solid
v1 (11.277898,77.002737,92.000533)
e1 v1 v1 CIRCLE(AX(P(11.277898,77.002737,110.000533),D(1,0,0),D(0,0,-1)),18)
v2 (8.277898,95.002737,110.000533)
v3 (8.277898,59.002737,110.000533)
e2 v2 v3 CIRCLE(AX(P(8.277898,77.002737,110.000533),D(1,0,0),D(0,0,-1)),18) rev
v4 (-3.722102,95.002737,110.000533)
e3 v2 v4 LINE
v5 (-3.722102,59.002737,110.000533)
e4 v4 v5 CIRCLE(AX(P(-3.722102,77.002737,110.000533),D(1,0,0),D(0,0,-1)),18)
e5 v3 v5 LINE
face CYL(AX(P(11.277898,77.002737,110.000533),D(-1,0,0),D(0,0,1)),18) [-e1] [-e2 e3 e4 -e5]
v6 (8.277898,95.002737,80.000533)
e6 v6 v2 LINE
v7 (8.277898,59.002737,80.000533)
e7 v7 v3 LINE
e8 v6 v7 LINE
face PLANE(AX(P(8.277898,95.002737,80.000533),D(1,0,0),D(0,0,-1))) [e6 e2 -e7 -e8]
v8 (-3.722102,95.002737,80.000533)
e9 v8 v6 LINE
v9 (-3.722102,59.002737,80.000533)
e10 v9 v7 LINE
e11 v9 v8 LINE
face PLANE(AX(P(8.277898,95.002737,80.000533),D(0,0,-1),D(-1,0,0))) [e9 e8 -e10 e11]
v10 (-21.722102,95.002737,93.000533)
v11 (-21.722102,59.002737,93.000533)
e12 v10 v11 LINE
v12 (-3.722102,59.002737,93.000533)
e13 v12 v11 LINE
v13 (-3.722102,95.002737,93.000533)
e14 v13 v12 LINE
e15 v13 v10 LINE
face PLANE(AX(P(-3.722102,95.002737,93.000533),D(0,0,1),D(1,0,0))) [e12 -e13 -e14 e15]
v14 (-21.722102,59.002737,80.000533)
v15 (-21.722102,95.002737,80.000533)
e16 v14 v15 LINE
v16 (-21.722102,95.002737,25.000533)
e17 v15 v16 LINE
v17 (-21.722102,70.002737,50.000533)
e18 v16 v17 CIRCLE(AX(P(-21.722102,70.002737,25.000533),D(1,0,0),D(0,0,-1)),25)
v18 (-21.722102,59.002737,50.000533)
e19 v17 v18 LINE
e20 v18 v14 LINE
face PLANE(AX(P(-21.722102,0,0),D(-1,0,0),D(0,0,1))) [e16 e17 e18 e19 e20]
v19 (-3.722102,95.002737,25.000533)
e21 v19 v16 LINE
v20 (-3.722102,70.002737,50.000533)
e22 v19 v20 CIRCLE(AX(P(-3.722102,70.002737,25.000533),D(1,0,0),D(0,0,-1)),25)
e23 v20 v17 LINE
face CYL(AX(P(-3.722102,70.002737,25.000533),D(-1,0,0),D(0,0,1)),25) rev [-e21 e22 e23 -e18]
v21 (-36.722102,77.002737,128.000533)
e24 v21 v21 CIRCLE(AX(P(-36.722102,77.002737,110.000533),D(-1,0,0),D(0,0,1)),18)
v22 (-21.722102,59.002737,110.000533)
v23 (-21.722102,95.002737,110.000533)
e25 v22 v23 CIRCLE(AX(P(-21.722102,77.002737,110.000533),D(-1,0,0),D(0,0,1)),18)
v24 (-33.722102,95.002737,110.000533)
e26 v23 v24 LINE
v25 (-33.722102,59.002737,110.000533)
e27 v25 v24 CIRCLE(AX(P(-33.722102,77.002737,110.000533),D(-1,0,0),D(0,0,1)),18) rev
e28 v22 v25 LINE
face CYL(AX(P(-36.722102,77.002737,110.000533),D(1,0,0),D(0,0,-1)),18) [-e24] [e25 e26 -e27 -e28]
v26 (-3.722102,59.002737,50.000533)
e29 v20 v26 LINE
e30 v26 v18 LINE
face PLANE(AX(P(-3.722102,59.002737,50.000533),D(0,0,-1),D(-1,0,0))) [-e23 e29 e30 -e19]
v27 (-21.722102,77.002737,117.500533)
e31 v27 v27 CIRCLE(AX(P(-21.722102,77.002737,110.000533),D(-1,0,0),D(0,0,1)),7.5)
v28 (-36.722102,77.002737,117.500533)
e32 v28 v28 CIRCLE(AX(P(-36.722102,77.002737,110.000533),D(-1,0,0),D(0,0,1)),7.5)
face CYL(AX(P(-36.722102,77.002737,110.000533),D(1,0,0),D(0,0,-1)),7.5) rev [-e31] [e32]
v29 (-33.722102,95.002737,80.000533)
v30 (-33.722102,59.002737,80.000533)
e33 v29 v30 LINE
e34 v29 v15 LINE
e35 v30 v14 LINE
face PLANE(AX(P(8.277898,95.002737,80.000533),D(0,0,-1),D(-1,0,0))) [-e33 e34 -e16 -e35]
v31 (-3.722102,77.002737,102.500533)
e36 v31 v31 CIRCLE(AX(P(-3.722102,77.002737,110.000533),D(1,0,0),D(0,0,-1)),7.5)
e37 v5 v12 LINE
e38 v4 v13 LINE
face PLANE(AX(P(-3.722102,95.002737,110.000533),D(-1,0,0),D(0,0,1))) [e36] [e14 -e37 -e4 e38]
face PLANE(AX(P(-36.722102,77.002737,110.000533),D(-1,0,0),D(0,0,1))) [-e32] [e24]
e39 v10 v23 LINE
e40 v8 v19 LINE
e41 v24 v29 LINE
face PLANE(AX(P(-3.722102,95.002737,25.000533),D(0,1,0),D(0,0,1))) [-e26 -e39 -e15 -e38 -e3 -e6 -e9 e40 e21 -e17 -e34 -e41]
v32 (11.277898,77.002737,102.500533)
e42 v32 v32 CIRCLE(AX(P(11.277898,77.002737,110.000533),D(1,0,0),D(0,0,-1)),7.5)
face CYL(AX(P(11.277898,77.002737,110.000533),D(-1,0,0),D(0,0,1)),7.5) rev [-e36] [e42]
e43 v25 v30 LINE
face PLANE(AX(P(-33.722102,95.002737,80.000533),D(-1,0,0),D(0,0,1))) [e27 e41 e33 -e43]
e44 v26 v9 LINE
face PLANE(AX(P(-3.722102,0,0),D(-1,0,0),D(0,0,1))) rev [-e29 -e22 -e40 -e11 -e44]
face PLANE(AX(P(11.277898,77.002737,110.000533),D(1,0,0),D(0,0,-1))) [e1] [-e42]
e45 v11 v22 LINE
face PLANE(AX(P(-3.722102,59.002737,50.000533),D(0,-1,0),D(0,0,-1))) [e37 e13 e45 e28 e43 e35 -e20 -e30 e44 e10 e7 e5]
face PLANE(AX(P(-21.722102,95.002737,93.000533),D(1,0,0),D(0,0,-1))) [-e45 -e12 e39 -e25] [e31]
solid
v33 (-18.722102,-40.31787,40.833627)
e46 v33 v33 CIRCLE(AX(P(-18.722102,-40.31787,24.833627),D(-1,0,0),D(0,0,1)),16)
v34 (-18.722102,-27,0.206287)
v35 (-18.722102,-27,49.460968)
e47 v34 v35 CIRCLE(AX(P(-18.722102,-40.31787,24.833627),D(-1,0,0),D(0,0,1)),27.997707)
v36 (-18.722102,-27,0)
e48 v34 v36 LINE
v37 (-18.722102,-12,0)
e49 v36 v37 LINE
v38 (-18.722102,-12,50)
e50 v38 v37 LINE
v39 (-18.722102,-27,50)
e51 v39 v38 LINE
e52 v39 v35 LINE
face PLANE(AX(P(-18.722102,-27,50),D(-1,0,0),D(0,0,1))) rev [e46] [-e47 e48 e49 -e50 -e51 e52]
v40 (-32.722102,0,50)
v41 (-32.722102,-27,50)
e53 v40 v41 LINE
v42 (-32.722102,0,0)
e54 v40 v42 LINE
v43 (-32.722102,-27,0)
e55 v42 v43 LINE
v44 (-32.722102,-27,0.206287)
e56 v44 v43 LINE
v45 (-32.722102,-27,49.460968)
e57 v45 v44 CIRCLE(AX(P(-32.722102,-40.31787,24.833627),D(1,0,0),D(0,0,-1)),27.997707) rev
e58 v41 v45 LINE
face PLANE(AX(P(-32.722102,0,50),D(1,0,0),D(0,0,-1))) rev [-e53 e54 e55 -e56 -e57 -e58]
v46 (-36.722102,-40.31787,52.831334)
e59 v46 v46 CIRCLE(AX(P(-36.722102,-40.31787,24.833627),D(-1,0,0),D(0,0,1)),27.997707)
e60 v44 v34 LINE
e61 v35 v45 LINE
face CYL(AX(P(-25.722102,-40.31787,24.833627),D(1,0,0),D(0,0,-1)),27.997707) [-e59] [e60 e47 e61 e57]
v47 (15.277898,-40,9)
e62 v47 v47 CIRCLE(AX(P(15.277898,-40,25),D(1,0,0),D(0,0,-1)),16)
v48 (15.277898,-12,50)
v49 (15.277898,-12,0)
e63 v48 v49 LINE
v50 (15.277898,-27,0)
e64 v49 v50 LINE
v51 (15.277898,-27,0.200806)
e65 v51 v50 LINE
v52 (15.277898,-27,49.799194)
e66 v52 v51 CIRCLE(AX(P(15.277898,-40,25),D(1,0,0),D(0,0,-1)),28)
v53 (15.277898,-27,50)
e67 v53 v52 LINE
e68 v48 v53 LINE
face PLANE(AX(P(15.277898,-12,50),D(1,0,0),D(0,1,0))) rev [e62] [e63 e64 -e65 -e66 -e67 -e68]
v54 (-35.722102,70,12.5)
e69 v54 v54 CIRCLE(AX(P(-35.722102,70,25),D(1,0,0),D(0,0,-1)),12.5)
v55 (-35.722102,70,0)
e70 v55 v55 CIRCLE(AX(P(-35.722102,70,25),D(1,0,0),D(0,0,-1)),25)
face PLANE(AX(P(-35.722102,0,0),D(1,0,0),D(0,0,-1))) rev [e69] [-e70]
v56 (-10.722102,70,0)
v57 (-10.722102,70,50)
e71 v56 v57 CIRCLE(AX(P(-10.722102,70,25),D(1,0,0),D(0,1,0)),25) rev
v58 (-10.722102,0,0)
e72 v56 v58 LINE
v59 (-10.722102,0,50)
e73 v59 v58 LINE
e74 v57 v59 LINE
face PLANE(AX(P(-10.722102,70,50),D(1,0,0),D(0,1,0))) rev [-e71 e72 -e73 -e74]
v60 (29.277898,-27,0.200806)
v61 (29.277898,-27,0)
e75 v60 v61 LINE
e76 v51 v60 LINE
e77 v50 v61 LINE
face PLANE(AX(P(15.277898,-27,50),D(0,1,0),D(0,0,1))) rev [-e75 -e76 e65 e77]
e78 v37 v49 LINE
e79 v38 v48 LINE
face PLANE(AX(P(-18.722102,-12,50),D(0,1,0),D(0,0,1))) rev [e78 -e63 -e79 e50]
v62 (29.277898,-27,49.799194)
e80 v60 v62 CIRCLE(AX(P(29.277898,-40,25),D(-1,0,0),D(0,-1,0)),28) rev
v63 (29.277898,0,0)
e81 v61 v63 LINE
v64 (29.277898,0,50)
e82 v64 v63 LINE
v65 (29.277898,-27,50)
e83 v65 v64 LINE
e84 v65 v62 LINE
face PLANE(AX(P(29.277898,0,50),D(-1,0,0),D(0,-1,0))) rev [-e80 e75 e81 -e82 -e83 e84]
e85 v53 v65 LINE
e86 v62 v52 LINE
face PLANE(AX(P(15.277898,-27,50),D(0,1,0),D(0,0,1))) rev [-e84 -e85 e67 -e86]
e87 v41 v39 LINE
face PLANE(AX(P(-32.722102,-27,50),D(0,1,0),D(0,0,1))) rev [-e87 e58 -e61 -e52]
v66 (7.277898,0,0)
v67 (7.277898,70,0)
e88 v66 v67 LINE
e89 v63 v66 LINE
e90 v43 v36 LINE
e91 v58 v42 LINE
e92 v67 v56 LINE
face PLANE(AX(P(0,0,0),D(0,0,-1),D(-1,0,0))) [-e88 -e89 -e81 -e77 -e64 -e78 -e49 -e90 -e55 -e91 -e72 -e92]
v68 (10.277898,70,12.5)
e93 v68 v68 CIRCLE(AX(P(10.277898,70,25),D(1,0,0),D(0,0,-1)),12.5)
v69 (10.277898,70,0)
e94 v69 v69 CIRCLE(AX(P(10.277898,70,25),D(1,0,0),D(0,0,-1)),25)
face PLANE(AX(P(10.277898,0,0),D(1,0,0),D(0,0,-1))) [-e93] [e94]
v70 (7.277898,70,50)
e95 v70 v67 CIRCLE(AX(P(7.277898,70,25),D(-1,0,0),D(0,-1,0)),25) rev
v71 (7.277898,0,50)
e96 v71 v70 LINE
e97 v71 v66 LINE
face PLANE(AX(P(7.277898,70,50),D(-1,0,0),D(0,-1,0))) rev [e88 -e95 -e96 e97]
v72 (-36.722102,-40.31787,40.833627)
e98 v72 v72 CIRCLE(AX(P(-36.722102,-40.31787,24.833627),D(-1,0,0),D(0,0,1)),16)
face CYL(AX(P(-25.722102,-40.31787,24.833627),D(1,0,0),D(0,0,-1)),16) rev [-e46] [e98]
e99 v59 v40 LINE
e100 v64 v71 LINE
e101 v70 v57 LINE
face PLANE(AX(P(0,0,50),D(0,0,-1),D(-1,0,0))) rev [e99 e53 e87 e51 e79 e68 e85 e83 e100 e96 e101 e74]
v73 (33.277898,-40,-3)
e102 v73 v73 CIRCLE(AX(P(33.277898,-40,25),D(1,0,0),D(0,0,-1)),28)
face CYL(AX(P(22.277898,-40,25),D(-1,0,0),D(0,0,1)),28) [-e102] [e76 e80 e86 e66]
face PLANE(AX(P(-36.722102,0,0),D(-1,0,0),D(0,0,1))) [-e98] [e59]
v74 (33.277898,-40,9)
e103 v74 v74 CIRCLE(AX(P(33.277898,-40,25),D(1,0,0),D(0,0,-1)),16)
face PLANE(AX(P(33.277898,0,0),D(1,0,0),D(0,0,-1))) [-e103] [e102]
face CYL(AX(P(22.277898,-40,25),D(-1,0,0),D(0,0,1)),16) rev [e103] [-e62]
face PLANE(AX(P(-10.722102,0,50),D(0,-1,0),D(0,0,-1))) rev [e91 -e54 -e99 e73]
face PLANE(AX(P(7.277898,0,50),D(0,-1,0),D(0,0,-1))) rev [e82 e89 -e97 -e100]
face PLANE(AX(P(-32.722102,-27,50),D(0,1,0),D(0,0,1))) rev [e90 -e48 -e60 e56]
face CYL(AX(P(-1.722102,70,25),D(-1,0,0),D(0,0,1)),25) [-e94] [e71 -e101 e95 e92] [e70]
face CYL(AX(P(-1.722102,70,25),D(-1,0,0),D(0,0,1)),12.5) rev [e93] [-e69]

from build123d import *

# Parameters (mm, degrees)
BOSS_EXTRUDE1_DEPTH       = 50
BOSS_EXTRUDE7_START       = 15.277897686
BOSS_EXTRUDE7_OUTLINE_R   = 28
BOSS_EXTRUDE7_OUTLINE_R_2 = 16
BOSS_EXTRUDE7_DEPTH       = 18
CUT_EXTRUDE1_START        = -40
CUT_EXTRUDE1_DEPTH        = 40
BOSS_EXTRUDE8_START       = -36.722102314
BOSS_EXTRUDE8_OUTLINE_R   = 27.997706522
BOSS_EXTRUDE8_OUTLINE_R_2 = 16
BOSS_EXTRUDE8_DEPTH       = 18
CUT_EXTRUDE2_DEPTH        = 20
BOSS_EXTRUDE9_START       = -35.722102314
BOSS_EXTRUDE9_OUTLINE_R   = 25
BOSS_EXTRUDE9_OUTLINE_R_2 = 12.5
BOSS_EXTRUDE9_DEPTH       = 46
CUT_EXTRUDE3_START        = -18
CUT_EXTRUDE3_DEPTH        = 18
BOSS_EXTRUDE10_DEPTH      = 18
BOSS_EXTRUDE11_DEPTH      = 36
BOSS_EXTRUDE12_DEPTH      = 3
BOSS_EXTRUDE12_DEPTH_BACK = 11.999999999999996
SKETCH11_R                = 17.999999999999993
SKETCH11_R_2              = 7.499999999999997
BOSS_EXTRUDE13_DEPTH      = 3
BOSS_EXTRUDE13_DEPTH_BACK = 11.999999999999996
SKETCH12_R                = 18.000000000000018
SKETCH12_R_2              = 7.500000000000014
CUT_EXTRUDE6_DEPTH        = 107.00000000000003


# Read off the part's stored shape, not the designer's step: Boss-Extrude7, Boss-Extrude8, Boss-Extrude9
with BuildPart() as part:
    # Sketch1 → Boss-Extrude1 (new body)
    with BuildSketch(Plane.XY):
        Polygon((-10.722102313940692, 70), (7.2778976860593065, 70), (7.277897686059314, 0), (29.277897686059326, 0), (29.277897686059333, -27), (15.27789768605932, -27), (15.277897686059319, -12), (-18.722102313940685, -12), (-18.722102313940685, -27), (-32.72210231394068, -27), (-32.72210231394068, 0), (-10.722102313940685, 0), align=None)
    extrude(amount=BOSS_EXTRUDE1_DEPTH)

    # Boss-Extrude7 outline → Boss-Extrude7 (add)
    with BuildSketch(Plane.YZ.offset(BOSS_EXTRUDE7_START)):
        with Locations((-40, 25)):
            Circle(BOSS_EXTRUDE7_OUTLINE_R)
        with Locations((-40, 25)):
            Circle(BOSS_EXTRUDE7_OUTLINE_R_2, mode=Mode.SUBTRACT)
    extrude(amount=BOSS_EXTRUDE7_DEPTH)

    # Sketch5 → Cut-Extrude1 (cut)
    with BuildSketch(Plane(origin=(29.277897686059326, 7.52e-15, 0), x_dir=(0, 0, -1), z_dir=(1, 1.3e-16, 0)).offset(CUT_EXTRUDE1_START)):
        with BuildLine():
            Line((-34.32737905308882, -27.000000000000007), (-15.672620946911175, -27.000000000000007))
            ThreePointArc((-15.672620946911175, -27.000000000000007), (-24.999999999999996, -24), (-34.32737905308882, -27.000000000000007))
        make_face()
    extrude(amount=CUT_EXTRUDE1_DEPTH, mode=Mode.SUBTRACT)

    # Boss-Extrude8 outline → Boss-Extrude8 (add)
    with BuildSketch(Plane.YZ.offset(BOSS_EXTRUDE8_START)):
        with Locations((-40.317870429, 24.833627259)):
            Circle(BOSS_EXTRUDE8_OUTLINE_R)
        with Locations((-40.317870429, 24.833627259)):
            Circle(BOSS_EXTRUDE8_OUTLINE_R_2, mode=Mode.SUBTRACT)
    extrude(amount=BOSS_EXTRUDE8_DEPTH)

    # Sketch7 → Cut-Extrude2 (cut)
    with BuildSketch(Plane.ZY.offset(32.72210231394068)):
        with BuildLine():
            Line((15.966027400668322, -27.000000000000004), (33.701227116351625, -27))
            ThreePointArc((33.701227116351625, -27), (24.833627258509974, -24.317870428908922), (15.966027400668322, -27.000000000000004))
        make_face()
    extrude(amount=-CUT_EXTRUDE2_DEPTH, mode=Mode.SUBTRACT)

    # Boss-Extrude9 outline → Boss-Extrude9 (add)
    with BuildSketch(Plane.YZ.offset(BOSS_EXTRUDE9_START)):
        with Locations((70, 25)):
            Circle(BOSS_EXTRUDE9_OUTLINE_R)
        with Locations((70, 25)):
            Circle(BOSS_EXTRUDE9_OUTLINE_R_2, mode=Mode.SUBTRACT)
    extrude(amount=BOSS_EXTRUDE9_DEPTH)

    # Sketch8 → Cut-Extrude3 (cut)
    with BuildSketch(Plane(origin=(7.277897686059314, 7.2e-16, 0), x_dir=(0, 0, -1), z_dir=(1, 1.1e-16, 0)).offset(CUT_EXTRUDE3_START)):
        with BuildLine():
            Line((-37.5, 70), (-12.500000000000004, 70))
            ThreePointArc((-12.500000000000004, 70), (-25, 57.5), (-37.5, 70))
        make_face()
    extrude(amount=CUT_EXTRUDE3_DEPTH, mode=Mode.SUBTRACT)


with BuildPart() as body_2:
    # 3DSketch6 → Boss-Extrude10 (new body)
    with BuildSketch(Plane(origin=(-3.722102313940688, 59.00273717207905, 50.00053283671438), x_dir=(0, 0.7682212795973759, 0.6401843996644798), z_dir=(-1, -1.2e-16, 0))):
        with BuildLine():
            Line((0, 0), (8.450434075571126, 7.042028396309271))
            ThreePointArc((8.450434075571126, 7.042028396309271), (17.343154245651732, 23.984166735180708), (11.651356073893528, 42.25217037785568))
            Line((11.651356073893528, 42.25217037785568), (46.86149805543992, -3.47e-15))
            Line((46.86149805543992, -3.47e-15), (19.205531989934393, -23.046638387921277))
            Line((19.205531989934393, -23.046638387921277), (0, 0))
        make_face()
    extrude(amount=BOSS_EXTRUDE10_DEPTH)

    # 3DSketch7 → Boss-Extrude11 (add)
    with BuildSketch(Plane(origin=(8.27789768605931, 95.00273717207905, 80.00053283671437), x_dir=(-0.8137334712067349, 0, 0.5812381937190965), z_dir=(0, -1, 0))):
        Polygon((0, 0), (17.437145811572893, -24.412004136202047), (27.201947466053713, -17.43714581157289), (17.32089817282907, -3.6036768010583953), (31.9681006545503, 6.858610685885341), (41.84914994777495, -6.974858324629154), (51.61395160225576, 0), (34.17680579068287, 24.412004136202057), align=None)
    extrude(amount=BOSS_EXTRUDE11_DEPTH)

    # Sketch11 → Boss-Extrude12 (add, two sides: drawn at the far end of the back side and taken through both)
    with BuildSketch(Plane(origin=(8.27789768605931, 0, 0), x_dir=(0, 0, -1), z_dir=(1, 0, 0)).offset(-BOSS_EXTRUDE12_DEPTH_BACK)):
        with Locations(Location((-110.00053283671436, 77.00273717207905, 0), (0, 0, 90))):
            Circle(SKETCH11_R)
        with Locations(Location((-110.00053283671436, 77.00273717207905, 0), (0, 0, 270))):
            Circle(SKETCH11_R_2, mode=Mode.SUBTRACT)
    extrude(amount=BOSS_EXTRUDE12_DEPTH + BOSS_EXTRUDE12_DEPTH_BACK)

    # Sketch12 → Boss-Extrude13 (add, two sides: drawn at the far end of the back side and taken through both)
    with BuildSketch(Plane.ZY.offset(33.72210231394072).offset(-BOSS_EXTRUDE13_DEPTH_BACK)):
        with Locations(Location((110.00053283671434, 77.00273717207905, 0), (0, 0, 90))):
            Circle(SKETCH12_R)
        with Locations(Location((110.00053283671434, 77.00273717207905, 0), (0, 0, 270))):
            Circle(SKETCH12_R_2, mode=Mode.SUBTRACT)
    extrude(amount=BOSS_EXTRUDE13_DEPTH + BOSS_EXTRUDE13_DEPTH_BACK)

    # Sketch13 → Cut-Extrude6 (cut)
    with BuildSketch(Plane(origin=(8.27789768605931, 0, 0), x_dir=(0, 0, -1), z_dir=(1, 0, 0))):
        with BuildLine():
            Line((-110.00053283671436, 84.50273717207904), (-110.00053283671437, 69.50273717207905))
            ThreePointArc((-110.00053283671437, 69.50273717207905), (-102.50053283671437, 77.00273717207905), (-110.00053283671436, 84.50273717207904))
        make_face()
    extrude(amount=-CUT_EXTRUDE6_DEPTH, mode=Mode.SUBTRACT)


solid = Compound([part.part, body_2.part])
